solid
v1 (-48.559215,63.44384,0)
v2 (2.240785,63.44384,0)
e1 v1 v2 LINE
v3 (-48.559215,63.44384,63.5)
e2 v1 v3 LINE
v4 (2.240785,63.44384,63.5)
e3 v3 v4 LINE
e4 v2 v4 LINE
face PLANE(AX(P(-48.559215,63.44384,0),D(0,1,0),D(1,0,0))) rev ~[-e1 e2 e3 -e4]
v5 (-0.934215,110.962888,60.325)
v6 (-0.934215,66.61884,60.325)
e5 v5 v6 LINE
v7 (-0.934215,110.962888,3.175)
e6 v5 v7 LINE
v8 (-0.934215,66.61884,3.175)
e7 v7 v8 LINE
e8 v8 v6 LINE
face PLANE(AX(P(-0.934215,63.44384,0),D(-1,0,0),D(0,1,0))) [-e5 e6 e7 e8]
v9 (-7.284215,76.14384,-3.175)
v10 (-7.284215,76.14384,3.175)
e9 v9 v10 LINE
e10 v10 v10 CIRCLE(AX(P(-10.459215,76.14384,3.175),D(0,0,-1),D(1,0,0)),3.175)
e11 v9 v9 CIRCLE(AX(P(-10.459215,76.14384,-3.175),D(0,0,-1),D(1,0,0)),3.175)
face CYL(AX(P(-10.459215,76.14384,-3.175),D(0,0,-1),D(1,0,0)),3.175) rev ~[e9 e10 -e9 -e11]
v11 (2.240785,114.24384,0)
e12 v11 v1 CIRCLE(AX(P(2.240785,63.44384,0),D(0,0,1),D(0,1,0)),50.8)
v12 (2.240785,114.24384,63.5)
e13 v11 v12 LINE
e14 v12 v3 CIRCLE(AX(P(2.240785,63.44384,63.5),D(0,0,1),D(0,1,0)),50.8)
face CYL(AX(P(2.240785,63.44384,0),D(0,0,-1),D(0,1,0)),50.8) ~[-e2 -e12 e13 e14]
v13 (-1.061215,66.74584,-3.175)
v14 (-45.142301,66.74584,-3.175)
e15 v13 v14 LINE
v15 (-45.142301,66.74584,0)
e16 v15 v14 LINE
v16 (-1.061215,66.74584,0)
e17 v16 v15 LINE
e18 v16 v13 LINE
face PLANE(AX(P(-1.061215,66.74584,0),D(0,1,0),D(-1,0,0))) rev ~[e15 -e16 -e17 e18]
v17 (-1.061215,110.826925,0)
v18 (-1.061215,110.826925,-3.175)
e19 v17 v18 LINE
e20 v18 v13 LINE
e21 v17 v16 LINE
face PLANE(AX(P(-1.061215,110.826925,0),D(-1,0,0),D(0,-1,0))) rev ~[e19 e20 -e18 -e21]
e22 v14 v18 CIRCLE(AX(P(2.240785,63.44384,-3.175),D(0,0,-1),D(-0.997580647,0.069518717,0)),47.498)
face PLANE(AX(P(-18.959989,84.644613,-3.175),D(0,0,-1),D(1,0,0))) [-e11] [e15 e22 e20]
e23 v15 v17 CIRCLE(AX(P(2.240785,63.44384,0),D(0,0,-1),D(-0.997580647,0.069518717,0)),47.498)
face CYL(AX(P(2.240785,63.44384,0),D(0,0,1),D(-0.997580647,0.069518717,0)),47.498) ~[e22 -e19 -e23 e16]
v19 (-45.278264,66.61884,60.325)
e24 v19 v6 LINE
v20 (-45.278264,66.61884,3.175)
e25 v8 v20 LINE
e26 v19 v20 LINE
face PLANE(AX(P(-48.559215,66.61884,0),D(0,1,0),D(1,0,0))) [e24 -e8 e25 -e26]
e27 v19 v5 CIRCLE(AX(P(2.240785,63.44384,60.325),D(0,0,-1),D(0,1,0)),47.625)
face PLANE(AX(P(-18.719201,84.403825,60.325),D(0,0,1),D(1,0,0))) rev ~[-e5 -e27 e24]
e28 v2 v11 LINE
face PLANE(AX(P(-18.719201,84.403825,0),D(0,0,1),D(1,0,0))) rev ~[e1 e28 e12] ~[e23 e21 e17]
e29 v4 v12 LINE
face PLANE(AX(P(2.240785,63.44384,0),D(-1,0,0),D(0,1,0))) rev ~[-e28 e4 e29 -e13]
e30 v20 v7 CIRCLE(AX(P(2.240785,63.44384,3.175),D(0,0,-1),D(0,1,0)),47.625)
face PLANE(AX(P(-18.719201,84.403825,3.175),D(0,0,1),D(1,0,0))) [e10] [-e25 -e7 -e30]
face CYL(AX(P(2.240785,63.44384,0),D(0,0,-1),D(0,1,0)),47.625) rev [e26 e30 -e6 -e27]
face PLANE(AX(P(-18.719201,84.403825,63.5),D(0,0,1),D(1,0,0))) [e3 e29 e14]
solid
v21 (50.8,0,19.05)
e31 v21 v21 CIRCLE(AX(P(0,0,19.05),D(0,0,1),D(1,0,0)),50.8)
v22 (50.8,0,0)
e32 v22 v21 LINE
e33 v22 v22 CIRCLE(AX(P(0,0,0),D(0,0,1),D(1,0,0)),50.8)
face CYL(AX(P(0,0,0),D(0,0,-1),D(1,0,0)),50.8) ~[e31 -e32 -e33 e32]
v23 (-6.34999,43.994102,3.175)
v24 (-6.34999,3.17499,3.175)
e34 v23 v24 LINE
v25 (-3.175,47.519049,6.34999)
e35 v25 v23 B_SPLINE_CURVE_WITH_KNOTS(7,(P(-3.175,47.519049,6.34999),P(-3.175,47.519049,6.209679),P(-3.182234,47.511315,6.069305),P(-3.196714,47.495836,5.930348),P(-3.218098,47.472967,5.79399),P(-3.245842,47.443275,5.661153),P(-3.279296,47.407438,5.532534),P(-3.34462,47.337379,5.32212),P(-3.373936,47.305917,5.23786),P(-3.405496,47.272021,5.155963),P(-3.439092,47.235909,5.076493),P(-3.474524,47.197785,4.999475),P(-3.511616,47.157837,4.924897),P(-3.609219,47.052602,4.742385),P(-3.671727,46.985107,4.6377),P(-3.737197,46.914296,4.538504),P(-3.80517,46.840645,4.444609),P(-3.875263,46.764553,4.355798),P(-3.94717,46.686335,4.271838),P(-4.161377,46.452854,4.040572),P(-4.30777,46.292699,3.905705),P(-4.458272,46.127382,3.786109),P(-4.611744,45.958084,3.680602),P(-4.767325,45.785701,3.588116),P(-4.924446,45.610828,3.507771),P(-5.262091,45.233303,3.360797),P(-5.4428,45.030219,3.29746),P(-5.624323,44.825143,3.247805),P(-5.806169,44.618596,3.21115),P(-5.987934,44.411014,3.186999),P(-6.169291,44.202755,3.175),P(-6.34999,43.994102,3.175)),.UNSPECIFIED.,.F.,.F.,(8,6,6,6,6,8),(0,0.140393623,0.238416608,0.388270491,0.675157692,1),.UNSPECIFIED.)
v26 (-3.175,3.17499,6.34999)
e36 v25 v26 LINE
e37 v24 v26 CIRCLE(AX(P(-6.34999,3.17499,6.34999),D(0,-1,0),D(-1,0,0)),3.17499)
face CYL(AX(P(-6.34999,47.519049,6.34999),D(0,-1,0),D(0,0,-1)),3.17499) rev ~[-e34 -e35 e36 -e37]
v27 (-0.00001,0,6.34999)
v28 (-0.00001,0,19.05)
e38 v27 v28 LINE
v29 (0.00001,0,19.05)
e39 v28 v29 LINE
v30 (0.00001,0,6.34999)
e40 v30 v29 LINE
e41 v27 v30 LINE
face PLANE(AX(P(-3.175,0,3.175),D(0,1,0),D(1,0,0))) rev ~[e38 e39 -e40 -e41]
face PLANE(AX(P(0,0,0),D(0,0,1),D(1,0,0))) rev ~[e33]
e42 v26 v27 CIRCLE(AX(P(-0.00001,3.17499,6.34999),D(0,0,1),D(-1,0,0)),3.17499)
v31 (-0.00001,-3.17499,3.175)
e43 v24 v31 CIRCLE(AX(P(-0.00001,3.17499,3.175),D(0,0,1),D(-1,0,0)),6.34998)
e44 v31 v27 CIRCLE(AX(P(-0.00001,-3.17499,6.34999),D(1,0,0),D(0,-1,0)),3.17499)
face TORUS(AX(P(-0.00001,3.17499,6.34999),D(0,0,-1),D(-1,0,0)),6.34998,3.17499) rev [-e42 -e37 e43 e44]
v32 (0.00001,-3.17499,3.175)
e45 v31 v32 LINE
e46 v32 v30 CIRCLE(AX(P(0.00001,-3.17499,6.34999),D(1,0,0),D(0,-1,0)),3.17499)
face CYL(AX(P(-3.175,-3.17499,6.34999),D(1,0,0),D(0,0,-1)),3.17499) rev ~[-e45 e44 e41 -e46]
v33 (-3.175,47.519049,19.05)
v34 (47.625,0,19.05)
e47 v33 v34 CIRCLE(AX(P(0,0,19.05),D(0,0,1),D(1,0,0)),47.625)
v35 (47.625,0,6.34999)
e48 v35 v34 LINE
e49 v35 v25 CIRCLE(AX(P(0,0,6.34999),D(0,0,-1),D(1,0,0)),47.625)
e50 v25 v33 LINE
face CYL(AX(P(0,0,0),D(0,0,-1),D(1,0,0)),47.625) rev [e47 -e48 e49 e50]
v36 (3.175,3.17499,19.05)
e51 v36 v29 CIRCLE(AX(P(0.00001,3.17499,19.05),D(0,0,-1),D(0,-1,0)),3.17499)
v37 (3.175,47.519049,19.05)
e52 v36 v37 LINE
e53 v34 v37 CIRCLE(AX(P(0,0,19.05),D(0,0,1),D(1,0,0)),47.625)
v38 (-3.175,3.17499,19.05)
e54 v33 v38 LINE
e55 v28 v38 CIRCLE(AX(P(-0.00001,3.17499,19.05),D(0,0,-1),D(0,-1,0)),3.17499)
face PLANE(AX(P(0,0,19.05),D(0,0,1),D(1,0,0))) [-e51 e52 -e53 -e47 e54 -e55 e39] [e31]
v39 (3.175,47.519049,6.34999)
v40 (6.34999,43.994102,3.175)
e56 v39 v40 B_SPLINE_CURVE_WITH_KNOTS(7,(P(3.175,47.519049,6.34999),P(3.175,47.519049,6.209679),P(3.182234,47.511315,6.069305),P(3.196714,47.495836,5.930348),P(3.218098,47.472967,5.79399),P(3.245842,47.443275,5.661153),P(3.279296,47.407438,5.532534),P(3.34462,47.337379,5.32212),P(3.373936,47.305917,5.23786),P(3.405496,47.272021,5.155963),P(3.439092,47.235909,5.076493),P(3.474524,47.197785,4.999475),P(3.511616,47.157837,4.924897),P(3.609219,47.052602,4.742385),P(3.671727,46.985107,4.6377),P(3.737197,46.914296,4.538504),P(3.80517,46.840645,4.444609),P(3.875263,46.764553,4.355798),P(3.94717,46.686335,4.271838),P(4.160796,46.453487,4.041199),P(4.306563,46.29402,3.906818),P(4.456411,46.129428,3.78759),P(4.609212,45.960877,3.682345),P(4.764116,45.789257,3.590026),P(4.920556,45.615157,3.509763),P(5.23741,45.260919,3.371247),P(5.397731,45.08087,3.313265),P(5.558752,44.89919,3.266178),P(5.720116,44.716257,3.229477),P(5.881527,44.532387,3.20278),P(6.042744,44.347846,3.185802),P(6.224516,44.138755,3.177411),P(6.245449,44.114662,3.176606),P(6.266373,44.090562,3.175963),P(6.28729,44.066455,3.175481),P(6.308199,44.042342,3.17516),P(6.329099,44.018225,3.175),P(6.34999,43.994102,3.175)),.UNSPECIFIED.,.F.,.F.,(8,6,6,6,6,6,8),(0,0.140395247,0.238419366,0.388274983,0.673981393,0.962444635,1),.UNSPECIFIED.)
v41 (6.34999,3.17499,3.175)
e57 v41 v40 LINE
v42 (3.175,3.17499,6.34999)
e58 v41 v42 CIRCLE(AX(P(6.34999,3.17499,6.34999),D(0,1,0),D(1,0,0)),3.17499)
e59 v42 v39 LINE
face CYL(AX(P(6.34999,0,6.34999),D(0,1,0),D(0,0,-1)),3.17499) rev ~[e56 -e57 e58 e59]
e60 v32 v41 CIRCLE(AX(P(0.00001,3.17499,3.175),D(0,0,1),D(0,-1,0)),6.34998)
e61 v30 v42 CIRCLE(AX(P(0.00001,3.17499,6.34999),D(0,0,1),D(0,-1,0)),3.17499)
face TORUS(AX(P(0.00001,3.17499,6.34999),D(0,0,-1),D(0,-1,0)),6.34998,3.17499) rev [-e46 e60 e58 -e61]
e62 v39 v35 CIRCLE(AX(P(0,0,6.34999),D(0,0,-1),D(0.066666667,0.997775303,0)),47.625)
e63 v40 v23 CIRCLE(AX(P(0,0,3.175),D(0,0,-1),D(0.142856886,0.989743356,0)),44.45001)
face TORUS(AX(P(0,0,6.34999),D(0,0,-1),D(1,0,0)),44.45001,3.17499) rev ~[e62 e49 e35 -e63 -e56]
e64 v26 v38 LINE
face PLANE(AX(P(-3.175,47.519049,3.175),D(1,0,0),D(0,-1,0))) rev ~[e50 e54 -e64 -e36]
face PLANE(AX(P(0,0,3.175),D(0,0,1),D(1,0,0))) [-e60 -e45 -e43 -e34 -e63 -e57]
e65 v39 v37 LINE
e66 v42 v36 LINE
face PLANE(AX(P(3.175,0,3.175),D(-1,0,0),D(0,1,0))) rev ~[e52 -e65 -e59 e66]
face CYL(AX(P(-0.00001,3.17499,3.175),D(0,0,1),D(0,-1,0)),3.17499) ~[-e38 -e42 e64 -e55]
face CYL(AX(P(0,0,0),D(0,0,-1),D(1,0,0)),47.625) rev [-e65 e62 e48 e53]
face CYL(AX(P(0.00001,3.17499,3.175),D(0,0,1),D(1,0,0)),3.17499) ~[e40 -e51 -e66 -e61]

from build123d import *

# Parameters (mm, degrees)
F0_R      = 50.8
F1_DEPTH  = 19.05
F2_T      = -3.175
F4_DEPTH  = 15.875
F5_R      = 3.17499
F7_DEPTH  = 63.5
F8_T      = -3.175
F10_DEPTH = 3.175
F11_R     = 3.175
F12_DEPTH = 25.4


# Not quite as in the source:
# - a fillet or chamfer is up to 0.001 mm smaller than in the source, because OpenCascade refuses the exact size


with BuildPart() as f1:
    # F0 (on Top) → F1 (new body)
    with BuildSketch(Plane.XY):
        Circle(F0_R)
    extrude(amount=F1_DEPTH)

    # F2
    f2_openings = [f1.faces().sort_by_distance(p)[0] for p in [
        (0, 0, 19.05),
    ]]
    offset(amount=F2_T, openings=f2_openings)

    # F3 (on face) → F4 (join, through all)
    with BuildSketch(Plane.XY.offset(3.175)):
        with BuildLine():
            Line((-3.175, 0), (0, 0))
            Line((0, 0), (3.175, 0))
            Line((3.175, 0), (3.175, 47.519048812))
            ThreePointArc((3.175, 47.519048812), (0, 47.625), (-3.175, 47.519048812))
            Line((-3.175, 47.519048812), (-3.175, 0))
        make_face()
    extrude(amount=F4_DEPTH)

    # F5 (radius 3.175 in the source; OpenCascade refuses exactly that, so slightly less here)
    f5_edges = [f1.edges().sort_by_distance(p)[0] for p in [
        (34.780382, 32.534069, 3.175),
        (-32.534069, -34.780382, 3.175),
        (-3.175, 23.759524, 3.175),
        (0, 0, 3.175),
        (3.175, 23.759524, 3.175),
        (3.175, 0, 11.1125),
        (-3.175, 0, 11.1125),
    ]]
    fillet(f5_edges, radius=F5_R)


with BuildPart() as f7:
    # F6 (on Top) → F7 (new body)
    with BuildSketch(Plane.XY):
        with BuildLine():
            Line((-48.5592149198, 63.44383955), (2.2407850802, 63.44383955))
            Line((2.2407850802, 63.44383955), (2.2407850802, 114.24383955))
            ThreePointArc((2.2407850802, 114.24383955), (-33.6802394041, 99.3648640343), (-48.5592149198, 63.44383955))
        make_face()
    extrude(amount=F7_DEPTH)

    # F8 (hollow: no face is removed)
    offset(amount=F8_T, mode=Mode.SUBTRACT)

    # F9 (on face) → F10 (join)
    with BuildSketch(Plane(origin=(0, 0, 0), x_dir=(1, 0, 0), z_dir=(0, 0, -1))):
        with BuildLine():
            Line((-1.0612149198, -110.8269251397), (-1.0612149198, -66.74583955))
            Line((-1.0612149198, -66.74583955), (-45.1423005095, -66.74583955))
            ThreePointArc((-45.1423005095, -66.74583955), (-31.3453728126, -97.0299974428), (-1.0612149198, -110.8269251397))
        make_face()
    extrude(amount=F10_DEPTH)

    # F11 (on face) → F12 (cut)
    with BuildSketch(Plane(origin=(0, 0, -3.175), x_dir=(1, 0, 0), z_dir=(0, 0, -1))):
        with Locations((-10.4592149198, -76.14383955)):
            Circle(F11_R)
    extrude(amount=-F12_DEPTH, mode=Mode.SUBTRACT)


solid = Compound([f1.part, f7.part])
